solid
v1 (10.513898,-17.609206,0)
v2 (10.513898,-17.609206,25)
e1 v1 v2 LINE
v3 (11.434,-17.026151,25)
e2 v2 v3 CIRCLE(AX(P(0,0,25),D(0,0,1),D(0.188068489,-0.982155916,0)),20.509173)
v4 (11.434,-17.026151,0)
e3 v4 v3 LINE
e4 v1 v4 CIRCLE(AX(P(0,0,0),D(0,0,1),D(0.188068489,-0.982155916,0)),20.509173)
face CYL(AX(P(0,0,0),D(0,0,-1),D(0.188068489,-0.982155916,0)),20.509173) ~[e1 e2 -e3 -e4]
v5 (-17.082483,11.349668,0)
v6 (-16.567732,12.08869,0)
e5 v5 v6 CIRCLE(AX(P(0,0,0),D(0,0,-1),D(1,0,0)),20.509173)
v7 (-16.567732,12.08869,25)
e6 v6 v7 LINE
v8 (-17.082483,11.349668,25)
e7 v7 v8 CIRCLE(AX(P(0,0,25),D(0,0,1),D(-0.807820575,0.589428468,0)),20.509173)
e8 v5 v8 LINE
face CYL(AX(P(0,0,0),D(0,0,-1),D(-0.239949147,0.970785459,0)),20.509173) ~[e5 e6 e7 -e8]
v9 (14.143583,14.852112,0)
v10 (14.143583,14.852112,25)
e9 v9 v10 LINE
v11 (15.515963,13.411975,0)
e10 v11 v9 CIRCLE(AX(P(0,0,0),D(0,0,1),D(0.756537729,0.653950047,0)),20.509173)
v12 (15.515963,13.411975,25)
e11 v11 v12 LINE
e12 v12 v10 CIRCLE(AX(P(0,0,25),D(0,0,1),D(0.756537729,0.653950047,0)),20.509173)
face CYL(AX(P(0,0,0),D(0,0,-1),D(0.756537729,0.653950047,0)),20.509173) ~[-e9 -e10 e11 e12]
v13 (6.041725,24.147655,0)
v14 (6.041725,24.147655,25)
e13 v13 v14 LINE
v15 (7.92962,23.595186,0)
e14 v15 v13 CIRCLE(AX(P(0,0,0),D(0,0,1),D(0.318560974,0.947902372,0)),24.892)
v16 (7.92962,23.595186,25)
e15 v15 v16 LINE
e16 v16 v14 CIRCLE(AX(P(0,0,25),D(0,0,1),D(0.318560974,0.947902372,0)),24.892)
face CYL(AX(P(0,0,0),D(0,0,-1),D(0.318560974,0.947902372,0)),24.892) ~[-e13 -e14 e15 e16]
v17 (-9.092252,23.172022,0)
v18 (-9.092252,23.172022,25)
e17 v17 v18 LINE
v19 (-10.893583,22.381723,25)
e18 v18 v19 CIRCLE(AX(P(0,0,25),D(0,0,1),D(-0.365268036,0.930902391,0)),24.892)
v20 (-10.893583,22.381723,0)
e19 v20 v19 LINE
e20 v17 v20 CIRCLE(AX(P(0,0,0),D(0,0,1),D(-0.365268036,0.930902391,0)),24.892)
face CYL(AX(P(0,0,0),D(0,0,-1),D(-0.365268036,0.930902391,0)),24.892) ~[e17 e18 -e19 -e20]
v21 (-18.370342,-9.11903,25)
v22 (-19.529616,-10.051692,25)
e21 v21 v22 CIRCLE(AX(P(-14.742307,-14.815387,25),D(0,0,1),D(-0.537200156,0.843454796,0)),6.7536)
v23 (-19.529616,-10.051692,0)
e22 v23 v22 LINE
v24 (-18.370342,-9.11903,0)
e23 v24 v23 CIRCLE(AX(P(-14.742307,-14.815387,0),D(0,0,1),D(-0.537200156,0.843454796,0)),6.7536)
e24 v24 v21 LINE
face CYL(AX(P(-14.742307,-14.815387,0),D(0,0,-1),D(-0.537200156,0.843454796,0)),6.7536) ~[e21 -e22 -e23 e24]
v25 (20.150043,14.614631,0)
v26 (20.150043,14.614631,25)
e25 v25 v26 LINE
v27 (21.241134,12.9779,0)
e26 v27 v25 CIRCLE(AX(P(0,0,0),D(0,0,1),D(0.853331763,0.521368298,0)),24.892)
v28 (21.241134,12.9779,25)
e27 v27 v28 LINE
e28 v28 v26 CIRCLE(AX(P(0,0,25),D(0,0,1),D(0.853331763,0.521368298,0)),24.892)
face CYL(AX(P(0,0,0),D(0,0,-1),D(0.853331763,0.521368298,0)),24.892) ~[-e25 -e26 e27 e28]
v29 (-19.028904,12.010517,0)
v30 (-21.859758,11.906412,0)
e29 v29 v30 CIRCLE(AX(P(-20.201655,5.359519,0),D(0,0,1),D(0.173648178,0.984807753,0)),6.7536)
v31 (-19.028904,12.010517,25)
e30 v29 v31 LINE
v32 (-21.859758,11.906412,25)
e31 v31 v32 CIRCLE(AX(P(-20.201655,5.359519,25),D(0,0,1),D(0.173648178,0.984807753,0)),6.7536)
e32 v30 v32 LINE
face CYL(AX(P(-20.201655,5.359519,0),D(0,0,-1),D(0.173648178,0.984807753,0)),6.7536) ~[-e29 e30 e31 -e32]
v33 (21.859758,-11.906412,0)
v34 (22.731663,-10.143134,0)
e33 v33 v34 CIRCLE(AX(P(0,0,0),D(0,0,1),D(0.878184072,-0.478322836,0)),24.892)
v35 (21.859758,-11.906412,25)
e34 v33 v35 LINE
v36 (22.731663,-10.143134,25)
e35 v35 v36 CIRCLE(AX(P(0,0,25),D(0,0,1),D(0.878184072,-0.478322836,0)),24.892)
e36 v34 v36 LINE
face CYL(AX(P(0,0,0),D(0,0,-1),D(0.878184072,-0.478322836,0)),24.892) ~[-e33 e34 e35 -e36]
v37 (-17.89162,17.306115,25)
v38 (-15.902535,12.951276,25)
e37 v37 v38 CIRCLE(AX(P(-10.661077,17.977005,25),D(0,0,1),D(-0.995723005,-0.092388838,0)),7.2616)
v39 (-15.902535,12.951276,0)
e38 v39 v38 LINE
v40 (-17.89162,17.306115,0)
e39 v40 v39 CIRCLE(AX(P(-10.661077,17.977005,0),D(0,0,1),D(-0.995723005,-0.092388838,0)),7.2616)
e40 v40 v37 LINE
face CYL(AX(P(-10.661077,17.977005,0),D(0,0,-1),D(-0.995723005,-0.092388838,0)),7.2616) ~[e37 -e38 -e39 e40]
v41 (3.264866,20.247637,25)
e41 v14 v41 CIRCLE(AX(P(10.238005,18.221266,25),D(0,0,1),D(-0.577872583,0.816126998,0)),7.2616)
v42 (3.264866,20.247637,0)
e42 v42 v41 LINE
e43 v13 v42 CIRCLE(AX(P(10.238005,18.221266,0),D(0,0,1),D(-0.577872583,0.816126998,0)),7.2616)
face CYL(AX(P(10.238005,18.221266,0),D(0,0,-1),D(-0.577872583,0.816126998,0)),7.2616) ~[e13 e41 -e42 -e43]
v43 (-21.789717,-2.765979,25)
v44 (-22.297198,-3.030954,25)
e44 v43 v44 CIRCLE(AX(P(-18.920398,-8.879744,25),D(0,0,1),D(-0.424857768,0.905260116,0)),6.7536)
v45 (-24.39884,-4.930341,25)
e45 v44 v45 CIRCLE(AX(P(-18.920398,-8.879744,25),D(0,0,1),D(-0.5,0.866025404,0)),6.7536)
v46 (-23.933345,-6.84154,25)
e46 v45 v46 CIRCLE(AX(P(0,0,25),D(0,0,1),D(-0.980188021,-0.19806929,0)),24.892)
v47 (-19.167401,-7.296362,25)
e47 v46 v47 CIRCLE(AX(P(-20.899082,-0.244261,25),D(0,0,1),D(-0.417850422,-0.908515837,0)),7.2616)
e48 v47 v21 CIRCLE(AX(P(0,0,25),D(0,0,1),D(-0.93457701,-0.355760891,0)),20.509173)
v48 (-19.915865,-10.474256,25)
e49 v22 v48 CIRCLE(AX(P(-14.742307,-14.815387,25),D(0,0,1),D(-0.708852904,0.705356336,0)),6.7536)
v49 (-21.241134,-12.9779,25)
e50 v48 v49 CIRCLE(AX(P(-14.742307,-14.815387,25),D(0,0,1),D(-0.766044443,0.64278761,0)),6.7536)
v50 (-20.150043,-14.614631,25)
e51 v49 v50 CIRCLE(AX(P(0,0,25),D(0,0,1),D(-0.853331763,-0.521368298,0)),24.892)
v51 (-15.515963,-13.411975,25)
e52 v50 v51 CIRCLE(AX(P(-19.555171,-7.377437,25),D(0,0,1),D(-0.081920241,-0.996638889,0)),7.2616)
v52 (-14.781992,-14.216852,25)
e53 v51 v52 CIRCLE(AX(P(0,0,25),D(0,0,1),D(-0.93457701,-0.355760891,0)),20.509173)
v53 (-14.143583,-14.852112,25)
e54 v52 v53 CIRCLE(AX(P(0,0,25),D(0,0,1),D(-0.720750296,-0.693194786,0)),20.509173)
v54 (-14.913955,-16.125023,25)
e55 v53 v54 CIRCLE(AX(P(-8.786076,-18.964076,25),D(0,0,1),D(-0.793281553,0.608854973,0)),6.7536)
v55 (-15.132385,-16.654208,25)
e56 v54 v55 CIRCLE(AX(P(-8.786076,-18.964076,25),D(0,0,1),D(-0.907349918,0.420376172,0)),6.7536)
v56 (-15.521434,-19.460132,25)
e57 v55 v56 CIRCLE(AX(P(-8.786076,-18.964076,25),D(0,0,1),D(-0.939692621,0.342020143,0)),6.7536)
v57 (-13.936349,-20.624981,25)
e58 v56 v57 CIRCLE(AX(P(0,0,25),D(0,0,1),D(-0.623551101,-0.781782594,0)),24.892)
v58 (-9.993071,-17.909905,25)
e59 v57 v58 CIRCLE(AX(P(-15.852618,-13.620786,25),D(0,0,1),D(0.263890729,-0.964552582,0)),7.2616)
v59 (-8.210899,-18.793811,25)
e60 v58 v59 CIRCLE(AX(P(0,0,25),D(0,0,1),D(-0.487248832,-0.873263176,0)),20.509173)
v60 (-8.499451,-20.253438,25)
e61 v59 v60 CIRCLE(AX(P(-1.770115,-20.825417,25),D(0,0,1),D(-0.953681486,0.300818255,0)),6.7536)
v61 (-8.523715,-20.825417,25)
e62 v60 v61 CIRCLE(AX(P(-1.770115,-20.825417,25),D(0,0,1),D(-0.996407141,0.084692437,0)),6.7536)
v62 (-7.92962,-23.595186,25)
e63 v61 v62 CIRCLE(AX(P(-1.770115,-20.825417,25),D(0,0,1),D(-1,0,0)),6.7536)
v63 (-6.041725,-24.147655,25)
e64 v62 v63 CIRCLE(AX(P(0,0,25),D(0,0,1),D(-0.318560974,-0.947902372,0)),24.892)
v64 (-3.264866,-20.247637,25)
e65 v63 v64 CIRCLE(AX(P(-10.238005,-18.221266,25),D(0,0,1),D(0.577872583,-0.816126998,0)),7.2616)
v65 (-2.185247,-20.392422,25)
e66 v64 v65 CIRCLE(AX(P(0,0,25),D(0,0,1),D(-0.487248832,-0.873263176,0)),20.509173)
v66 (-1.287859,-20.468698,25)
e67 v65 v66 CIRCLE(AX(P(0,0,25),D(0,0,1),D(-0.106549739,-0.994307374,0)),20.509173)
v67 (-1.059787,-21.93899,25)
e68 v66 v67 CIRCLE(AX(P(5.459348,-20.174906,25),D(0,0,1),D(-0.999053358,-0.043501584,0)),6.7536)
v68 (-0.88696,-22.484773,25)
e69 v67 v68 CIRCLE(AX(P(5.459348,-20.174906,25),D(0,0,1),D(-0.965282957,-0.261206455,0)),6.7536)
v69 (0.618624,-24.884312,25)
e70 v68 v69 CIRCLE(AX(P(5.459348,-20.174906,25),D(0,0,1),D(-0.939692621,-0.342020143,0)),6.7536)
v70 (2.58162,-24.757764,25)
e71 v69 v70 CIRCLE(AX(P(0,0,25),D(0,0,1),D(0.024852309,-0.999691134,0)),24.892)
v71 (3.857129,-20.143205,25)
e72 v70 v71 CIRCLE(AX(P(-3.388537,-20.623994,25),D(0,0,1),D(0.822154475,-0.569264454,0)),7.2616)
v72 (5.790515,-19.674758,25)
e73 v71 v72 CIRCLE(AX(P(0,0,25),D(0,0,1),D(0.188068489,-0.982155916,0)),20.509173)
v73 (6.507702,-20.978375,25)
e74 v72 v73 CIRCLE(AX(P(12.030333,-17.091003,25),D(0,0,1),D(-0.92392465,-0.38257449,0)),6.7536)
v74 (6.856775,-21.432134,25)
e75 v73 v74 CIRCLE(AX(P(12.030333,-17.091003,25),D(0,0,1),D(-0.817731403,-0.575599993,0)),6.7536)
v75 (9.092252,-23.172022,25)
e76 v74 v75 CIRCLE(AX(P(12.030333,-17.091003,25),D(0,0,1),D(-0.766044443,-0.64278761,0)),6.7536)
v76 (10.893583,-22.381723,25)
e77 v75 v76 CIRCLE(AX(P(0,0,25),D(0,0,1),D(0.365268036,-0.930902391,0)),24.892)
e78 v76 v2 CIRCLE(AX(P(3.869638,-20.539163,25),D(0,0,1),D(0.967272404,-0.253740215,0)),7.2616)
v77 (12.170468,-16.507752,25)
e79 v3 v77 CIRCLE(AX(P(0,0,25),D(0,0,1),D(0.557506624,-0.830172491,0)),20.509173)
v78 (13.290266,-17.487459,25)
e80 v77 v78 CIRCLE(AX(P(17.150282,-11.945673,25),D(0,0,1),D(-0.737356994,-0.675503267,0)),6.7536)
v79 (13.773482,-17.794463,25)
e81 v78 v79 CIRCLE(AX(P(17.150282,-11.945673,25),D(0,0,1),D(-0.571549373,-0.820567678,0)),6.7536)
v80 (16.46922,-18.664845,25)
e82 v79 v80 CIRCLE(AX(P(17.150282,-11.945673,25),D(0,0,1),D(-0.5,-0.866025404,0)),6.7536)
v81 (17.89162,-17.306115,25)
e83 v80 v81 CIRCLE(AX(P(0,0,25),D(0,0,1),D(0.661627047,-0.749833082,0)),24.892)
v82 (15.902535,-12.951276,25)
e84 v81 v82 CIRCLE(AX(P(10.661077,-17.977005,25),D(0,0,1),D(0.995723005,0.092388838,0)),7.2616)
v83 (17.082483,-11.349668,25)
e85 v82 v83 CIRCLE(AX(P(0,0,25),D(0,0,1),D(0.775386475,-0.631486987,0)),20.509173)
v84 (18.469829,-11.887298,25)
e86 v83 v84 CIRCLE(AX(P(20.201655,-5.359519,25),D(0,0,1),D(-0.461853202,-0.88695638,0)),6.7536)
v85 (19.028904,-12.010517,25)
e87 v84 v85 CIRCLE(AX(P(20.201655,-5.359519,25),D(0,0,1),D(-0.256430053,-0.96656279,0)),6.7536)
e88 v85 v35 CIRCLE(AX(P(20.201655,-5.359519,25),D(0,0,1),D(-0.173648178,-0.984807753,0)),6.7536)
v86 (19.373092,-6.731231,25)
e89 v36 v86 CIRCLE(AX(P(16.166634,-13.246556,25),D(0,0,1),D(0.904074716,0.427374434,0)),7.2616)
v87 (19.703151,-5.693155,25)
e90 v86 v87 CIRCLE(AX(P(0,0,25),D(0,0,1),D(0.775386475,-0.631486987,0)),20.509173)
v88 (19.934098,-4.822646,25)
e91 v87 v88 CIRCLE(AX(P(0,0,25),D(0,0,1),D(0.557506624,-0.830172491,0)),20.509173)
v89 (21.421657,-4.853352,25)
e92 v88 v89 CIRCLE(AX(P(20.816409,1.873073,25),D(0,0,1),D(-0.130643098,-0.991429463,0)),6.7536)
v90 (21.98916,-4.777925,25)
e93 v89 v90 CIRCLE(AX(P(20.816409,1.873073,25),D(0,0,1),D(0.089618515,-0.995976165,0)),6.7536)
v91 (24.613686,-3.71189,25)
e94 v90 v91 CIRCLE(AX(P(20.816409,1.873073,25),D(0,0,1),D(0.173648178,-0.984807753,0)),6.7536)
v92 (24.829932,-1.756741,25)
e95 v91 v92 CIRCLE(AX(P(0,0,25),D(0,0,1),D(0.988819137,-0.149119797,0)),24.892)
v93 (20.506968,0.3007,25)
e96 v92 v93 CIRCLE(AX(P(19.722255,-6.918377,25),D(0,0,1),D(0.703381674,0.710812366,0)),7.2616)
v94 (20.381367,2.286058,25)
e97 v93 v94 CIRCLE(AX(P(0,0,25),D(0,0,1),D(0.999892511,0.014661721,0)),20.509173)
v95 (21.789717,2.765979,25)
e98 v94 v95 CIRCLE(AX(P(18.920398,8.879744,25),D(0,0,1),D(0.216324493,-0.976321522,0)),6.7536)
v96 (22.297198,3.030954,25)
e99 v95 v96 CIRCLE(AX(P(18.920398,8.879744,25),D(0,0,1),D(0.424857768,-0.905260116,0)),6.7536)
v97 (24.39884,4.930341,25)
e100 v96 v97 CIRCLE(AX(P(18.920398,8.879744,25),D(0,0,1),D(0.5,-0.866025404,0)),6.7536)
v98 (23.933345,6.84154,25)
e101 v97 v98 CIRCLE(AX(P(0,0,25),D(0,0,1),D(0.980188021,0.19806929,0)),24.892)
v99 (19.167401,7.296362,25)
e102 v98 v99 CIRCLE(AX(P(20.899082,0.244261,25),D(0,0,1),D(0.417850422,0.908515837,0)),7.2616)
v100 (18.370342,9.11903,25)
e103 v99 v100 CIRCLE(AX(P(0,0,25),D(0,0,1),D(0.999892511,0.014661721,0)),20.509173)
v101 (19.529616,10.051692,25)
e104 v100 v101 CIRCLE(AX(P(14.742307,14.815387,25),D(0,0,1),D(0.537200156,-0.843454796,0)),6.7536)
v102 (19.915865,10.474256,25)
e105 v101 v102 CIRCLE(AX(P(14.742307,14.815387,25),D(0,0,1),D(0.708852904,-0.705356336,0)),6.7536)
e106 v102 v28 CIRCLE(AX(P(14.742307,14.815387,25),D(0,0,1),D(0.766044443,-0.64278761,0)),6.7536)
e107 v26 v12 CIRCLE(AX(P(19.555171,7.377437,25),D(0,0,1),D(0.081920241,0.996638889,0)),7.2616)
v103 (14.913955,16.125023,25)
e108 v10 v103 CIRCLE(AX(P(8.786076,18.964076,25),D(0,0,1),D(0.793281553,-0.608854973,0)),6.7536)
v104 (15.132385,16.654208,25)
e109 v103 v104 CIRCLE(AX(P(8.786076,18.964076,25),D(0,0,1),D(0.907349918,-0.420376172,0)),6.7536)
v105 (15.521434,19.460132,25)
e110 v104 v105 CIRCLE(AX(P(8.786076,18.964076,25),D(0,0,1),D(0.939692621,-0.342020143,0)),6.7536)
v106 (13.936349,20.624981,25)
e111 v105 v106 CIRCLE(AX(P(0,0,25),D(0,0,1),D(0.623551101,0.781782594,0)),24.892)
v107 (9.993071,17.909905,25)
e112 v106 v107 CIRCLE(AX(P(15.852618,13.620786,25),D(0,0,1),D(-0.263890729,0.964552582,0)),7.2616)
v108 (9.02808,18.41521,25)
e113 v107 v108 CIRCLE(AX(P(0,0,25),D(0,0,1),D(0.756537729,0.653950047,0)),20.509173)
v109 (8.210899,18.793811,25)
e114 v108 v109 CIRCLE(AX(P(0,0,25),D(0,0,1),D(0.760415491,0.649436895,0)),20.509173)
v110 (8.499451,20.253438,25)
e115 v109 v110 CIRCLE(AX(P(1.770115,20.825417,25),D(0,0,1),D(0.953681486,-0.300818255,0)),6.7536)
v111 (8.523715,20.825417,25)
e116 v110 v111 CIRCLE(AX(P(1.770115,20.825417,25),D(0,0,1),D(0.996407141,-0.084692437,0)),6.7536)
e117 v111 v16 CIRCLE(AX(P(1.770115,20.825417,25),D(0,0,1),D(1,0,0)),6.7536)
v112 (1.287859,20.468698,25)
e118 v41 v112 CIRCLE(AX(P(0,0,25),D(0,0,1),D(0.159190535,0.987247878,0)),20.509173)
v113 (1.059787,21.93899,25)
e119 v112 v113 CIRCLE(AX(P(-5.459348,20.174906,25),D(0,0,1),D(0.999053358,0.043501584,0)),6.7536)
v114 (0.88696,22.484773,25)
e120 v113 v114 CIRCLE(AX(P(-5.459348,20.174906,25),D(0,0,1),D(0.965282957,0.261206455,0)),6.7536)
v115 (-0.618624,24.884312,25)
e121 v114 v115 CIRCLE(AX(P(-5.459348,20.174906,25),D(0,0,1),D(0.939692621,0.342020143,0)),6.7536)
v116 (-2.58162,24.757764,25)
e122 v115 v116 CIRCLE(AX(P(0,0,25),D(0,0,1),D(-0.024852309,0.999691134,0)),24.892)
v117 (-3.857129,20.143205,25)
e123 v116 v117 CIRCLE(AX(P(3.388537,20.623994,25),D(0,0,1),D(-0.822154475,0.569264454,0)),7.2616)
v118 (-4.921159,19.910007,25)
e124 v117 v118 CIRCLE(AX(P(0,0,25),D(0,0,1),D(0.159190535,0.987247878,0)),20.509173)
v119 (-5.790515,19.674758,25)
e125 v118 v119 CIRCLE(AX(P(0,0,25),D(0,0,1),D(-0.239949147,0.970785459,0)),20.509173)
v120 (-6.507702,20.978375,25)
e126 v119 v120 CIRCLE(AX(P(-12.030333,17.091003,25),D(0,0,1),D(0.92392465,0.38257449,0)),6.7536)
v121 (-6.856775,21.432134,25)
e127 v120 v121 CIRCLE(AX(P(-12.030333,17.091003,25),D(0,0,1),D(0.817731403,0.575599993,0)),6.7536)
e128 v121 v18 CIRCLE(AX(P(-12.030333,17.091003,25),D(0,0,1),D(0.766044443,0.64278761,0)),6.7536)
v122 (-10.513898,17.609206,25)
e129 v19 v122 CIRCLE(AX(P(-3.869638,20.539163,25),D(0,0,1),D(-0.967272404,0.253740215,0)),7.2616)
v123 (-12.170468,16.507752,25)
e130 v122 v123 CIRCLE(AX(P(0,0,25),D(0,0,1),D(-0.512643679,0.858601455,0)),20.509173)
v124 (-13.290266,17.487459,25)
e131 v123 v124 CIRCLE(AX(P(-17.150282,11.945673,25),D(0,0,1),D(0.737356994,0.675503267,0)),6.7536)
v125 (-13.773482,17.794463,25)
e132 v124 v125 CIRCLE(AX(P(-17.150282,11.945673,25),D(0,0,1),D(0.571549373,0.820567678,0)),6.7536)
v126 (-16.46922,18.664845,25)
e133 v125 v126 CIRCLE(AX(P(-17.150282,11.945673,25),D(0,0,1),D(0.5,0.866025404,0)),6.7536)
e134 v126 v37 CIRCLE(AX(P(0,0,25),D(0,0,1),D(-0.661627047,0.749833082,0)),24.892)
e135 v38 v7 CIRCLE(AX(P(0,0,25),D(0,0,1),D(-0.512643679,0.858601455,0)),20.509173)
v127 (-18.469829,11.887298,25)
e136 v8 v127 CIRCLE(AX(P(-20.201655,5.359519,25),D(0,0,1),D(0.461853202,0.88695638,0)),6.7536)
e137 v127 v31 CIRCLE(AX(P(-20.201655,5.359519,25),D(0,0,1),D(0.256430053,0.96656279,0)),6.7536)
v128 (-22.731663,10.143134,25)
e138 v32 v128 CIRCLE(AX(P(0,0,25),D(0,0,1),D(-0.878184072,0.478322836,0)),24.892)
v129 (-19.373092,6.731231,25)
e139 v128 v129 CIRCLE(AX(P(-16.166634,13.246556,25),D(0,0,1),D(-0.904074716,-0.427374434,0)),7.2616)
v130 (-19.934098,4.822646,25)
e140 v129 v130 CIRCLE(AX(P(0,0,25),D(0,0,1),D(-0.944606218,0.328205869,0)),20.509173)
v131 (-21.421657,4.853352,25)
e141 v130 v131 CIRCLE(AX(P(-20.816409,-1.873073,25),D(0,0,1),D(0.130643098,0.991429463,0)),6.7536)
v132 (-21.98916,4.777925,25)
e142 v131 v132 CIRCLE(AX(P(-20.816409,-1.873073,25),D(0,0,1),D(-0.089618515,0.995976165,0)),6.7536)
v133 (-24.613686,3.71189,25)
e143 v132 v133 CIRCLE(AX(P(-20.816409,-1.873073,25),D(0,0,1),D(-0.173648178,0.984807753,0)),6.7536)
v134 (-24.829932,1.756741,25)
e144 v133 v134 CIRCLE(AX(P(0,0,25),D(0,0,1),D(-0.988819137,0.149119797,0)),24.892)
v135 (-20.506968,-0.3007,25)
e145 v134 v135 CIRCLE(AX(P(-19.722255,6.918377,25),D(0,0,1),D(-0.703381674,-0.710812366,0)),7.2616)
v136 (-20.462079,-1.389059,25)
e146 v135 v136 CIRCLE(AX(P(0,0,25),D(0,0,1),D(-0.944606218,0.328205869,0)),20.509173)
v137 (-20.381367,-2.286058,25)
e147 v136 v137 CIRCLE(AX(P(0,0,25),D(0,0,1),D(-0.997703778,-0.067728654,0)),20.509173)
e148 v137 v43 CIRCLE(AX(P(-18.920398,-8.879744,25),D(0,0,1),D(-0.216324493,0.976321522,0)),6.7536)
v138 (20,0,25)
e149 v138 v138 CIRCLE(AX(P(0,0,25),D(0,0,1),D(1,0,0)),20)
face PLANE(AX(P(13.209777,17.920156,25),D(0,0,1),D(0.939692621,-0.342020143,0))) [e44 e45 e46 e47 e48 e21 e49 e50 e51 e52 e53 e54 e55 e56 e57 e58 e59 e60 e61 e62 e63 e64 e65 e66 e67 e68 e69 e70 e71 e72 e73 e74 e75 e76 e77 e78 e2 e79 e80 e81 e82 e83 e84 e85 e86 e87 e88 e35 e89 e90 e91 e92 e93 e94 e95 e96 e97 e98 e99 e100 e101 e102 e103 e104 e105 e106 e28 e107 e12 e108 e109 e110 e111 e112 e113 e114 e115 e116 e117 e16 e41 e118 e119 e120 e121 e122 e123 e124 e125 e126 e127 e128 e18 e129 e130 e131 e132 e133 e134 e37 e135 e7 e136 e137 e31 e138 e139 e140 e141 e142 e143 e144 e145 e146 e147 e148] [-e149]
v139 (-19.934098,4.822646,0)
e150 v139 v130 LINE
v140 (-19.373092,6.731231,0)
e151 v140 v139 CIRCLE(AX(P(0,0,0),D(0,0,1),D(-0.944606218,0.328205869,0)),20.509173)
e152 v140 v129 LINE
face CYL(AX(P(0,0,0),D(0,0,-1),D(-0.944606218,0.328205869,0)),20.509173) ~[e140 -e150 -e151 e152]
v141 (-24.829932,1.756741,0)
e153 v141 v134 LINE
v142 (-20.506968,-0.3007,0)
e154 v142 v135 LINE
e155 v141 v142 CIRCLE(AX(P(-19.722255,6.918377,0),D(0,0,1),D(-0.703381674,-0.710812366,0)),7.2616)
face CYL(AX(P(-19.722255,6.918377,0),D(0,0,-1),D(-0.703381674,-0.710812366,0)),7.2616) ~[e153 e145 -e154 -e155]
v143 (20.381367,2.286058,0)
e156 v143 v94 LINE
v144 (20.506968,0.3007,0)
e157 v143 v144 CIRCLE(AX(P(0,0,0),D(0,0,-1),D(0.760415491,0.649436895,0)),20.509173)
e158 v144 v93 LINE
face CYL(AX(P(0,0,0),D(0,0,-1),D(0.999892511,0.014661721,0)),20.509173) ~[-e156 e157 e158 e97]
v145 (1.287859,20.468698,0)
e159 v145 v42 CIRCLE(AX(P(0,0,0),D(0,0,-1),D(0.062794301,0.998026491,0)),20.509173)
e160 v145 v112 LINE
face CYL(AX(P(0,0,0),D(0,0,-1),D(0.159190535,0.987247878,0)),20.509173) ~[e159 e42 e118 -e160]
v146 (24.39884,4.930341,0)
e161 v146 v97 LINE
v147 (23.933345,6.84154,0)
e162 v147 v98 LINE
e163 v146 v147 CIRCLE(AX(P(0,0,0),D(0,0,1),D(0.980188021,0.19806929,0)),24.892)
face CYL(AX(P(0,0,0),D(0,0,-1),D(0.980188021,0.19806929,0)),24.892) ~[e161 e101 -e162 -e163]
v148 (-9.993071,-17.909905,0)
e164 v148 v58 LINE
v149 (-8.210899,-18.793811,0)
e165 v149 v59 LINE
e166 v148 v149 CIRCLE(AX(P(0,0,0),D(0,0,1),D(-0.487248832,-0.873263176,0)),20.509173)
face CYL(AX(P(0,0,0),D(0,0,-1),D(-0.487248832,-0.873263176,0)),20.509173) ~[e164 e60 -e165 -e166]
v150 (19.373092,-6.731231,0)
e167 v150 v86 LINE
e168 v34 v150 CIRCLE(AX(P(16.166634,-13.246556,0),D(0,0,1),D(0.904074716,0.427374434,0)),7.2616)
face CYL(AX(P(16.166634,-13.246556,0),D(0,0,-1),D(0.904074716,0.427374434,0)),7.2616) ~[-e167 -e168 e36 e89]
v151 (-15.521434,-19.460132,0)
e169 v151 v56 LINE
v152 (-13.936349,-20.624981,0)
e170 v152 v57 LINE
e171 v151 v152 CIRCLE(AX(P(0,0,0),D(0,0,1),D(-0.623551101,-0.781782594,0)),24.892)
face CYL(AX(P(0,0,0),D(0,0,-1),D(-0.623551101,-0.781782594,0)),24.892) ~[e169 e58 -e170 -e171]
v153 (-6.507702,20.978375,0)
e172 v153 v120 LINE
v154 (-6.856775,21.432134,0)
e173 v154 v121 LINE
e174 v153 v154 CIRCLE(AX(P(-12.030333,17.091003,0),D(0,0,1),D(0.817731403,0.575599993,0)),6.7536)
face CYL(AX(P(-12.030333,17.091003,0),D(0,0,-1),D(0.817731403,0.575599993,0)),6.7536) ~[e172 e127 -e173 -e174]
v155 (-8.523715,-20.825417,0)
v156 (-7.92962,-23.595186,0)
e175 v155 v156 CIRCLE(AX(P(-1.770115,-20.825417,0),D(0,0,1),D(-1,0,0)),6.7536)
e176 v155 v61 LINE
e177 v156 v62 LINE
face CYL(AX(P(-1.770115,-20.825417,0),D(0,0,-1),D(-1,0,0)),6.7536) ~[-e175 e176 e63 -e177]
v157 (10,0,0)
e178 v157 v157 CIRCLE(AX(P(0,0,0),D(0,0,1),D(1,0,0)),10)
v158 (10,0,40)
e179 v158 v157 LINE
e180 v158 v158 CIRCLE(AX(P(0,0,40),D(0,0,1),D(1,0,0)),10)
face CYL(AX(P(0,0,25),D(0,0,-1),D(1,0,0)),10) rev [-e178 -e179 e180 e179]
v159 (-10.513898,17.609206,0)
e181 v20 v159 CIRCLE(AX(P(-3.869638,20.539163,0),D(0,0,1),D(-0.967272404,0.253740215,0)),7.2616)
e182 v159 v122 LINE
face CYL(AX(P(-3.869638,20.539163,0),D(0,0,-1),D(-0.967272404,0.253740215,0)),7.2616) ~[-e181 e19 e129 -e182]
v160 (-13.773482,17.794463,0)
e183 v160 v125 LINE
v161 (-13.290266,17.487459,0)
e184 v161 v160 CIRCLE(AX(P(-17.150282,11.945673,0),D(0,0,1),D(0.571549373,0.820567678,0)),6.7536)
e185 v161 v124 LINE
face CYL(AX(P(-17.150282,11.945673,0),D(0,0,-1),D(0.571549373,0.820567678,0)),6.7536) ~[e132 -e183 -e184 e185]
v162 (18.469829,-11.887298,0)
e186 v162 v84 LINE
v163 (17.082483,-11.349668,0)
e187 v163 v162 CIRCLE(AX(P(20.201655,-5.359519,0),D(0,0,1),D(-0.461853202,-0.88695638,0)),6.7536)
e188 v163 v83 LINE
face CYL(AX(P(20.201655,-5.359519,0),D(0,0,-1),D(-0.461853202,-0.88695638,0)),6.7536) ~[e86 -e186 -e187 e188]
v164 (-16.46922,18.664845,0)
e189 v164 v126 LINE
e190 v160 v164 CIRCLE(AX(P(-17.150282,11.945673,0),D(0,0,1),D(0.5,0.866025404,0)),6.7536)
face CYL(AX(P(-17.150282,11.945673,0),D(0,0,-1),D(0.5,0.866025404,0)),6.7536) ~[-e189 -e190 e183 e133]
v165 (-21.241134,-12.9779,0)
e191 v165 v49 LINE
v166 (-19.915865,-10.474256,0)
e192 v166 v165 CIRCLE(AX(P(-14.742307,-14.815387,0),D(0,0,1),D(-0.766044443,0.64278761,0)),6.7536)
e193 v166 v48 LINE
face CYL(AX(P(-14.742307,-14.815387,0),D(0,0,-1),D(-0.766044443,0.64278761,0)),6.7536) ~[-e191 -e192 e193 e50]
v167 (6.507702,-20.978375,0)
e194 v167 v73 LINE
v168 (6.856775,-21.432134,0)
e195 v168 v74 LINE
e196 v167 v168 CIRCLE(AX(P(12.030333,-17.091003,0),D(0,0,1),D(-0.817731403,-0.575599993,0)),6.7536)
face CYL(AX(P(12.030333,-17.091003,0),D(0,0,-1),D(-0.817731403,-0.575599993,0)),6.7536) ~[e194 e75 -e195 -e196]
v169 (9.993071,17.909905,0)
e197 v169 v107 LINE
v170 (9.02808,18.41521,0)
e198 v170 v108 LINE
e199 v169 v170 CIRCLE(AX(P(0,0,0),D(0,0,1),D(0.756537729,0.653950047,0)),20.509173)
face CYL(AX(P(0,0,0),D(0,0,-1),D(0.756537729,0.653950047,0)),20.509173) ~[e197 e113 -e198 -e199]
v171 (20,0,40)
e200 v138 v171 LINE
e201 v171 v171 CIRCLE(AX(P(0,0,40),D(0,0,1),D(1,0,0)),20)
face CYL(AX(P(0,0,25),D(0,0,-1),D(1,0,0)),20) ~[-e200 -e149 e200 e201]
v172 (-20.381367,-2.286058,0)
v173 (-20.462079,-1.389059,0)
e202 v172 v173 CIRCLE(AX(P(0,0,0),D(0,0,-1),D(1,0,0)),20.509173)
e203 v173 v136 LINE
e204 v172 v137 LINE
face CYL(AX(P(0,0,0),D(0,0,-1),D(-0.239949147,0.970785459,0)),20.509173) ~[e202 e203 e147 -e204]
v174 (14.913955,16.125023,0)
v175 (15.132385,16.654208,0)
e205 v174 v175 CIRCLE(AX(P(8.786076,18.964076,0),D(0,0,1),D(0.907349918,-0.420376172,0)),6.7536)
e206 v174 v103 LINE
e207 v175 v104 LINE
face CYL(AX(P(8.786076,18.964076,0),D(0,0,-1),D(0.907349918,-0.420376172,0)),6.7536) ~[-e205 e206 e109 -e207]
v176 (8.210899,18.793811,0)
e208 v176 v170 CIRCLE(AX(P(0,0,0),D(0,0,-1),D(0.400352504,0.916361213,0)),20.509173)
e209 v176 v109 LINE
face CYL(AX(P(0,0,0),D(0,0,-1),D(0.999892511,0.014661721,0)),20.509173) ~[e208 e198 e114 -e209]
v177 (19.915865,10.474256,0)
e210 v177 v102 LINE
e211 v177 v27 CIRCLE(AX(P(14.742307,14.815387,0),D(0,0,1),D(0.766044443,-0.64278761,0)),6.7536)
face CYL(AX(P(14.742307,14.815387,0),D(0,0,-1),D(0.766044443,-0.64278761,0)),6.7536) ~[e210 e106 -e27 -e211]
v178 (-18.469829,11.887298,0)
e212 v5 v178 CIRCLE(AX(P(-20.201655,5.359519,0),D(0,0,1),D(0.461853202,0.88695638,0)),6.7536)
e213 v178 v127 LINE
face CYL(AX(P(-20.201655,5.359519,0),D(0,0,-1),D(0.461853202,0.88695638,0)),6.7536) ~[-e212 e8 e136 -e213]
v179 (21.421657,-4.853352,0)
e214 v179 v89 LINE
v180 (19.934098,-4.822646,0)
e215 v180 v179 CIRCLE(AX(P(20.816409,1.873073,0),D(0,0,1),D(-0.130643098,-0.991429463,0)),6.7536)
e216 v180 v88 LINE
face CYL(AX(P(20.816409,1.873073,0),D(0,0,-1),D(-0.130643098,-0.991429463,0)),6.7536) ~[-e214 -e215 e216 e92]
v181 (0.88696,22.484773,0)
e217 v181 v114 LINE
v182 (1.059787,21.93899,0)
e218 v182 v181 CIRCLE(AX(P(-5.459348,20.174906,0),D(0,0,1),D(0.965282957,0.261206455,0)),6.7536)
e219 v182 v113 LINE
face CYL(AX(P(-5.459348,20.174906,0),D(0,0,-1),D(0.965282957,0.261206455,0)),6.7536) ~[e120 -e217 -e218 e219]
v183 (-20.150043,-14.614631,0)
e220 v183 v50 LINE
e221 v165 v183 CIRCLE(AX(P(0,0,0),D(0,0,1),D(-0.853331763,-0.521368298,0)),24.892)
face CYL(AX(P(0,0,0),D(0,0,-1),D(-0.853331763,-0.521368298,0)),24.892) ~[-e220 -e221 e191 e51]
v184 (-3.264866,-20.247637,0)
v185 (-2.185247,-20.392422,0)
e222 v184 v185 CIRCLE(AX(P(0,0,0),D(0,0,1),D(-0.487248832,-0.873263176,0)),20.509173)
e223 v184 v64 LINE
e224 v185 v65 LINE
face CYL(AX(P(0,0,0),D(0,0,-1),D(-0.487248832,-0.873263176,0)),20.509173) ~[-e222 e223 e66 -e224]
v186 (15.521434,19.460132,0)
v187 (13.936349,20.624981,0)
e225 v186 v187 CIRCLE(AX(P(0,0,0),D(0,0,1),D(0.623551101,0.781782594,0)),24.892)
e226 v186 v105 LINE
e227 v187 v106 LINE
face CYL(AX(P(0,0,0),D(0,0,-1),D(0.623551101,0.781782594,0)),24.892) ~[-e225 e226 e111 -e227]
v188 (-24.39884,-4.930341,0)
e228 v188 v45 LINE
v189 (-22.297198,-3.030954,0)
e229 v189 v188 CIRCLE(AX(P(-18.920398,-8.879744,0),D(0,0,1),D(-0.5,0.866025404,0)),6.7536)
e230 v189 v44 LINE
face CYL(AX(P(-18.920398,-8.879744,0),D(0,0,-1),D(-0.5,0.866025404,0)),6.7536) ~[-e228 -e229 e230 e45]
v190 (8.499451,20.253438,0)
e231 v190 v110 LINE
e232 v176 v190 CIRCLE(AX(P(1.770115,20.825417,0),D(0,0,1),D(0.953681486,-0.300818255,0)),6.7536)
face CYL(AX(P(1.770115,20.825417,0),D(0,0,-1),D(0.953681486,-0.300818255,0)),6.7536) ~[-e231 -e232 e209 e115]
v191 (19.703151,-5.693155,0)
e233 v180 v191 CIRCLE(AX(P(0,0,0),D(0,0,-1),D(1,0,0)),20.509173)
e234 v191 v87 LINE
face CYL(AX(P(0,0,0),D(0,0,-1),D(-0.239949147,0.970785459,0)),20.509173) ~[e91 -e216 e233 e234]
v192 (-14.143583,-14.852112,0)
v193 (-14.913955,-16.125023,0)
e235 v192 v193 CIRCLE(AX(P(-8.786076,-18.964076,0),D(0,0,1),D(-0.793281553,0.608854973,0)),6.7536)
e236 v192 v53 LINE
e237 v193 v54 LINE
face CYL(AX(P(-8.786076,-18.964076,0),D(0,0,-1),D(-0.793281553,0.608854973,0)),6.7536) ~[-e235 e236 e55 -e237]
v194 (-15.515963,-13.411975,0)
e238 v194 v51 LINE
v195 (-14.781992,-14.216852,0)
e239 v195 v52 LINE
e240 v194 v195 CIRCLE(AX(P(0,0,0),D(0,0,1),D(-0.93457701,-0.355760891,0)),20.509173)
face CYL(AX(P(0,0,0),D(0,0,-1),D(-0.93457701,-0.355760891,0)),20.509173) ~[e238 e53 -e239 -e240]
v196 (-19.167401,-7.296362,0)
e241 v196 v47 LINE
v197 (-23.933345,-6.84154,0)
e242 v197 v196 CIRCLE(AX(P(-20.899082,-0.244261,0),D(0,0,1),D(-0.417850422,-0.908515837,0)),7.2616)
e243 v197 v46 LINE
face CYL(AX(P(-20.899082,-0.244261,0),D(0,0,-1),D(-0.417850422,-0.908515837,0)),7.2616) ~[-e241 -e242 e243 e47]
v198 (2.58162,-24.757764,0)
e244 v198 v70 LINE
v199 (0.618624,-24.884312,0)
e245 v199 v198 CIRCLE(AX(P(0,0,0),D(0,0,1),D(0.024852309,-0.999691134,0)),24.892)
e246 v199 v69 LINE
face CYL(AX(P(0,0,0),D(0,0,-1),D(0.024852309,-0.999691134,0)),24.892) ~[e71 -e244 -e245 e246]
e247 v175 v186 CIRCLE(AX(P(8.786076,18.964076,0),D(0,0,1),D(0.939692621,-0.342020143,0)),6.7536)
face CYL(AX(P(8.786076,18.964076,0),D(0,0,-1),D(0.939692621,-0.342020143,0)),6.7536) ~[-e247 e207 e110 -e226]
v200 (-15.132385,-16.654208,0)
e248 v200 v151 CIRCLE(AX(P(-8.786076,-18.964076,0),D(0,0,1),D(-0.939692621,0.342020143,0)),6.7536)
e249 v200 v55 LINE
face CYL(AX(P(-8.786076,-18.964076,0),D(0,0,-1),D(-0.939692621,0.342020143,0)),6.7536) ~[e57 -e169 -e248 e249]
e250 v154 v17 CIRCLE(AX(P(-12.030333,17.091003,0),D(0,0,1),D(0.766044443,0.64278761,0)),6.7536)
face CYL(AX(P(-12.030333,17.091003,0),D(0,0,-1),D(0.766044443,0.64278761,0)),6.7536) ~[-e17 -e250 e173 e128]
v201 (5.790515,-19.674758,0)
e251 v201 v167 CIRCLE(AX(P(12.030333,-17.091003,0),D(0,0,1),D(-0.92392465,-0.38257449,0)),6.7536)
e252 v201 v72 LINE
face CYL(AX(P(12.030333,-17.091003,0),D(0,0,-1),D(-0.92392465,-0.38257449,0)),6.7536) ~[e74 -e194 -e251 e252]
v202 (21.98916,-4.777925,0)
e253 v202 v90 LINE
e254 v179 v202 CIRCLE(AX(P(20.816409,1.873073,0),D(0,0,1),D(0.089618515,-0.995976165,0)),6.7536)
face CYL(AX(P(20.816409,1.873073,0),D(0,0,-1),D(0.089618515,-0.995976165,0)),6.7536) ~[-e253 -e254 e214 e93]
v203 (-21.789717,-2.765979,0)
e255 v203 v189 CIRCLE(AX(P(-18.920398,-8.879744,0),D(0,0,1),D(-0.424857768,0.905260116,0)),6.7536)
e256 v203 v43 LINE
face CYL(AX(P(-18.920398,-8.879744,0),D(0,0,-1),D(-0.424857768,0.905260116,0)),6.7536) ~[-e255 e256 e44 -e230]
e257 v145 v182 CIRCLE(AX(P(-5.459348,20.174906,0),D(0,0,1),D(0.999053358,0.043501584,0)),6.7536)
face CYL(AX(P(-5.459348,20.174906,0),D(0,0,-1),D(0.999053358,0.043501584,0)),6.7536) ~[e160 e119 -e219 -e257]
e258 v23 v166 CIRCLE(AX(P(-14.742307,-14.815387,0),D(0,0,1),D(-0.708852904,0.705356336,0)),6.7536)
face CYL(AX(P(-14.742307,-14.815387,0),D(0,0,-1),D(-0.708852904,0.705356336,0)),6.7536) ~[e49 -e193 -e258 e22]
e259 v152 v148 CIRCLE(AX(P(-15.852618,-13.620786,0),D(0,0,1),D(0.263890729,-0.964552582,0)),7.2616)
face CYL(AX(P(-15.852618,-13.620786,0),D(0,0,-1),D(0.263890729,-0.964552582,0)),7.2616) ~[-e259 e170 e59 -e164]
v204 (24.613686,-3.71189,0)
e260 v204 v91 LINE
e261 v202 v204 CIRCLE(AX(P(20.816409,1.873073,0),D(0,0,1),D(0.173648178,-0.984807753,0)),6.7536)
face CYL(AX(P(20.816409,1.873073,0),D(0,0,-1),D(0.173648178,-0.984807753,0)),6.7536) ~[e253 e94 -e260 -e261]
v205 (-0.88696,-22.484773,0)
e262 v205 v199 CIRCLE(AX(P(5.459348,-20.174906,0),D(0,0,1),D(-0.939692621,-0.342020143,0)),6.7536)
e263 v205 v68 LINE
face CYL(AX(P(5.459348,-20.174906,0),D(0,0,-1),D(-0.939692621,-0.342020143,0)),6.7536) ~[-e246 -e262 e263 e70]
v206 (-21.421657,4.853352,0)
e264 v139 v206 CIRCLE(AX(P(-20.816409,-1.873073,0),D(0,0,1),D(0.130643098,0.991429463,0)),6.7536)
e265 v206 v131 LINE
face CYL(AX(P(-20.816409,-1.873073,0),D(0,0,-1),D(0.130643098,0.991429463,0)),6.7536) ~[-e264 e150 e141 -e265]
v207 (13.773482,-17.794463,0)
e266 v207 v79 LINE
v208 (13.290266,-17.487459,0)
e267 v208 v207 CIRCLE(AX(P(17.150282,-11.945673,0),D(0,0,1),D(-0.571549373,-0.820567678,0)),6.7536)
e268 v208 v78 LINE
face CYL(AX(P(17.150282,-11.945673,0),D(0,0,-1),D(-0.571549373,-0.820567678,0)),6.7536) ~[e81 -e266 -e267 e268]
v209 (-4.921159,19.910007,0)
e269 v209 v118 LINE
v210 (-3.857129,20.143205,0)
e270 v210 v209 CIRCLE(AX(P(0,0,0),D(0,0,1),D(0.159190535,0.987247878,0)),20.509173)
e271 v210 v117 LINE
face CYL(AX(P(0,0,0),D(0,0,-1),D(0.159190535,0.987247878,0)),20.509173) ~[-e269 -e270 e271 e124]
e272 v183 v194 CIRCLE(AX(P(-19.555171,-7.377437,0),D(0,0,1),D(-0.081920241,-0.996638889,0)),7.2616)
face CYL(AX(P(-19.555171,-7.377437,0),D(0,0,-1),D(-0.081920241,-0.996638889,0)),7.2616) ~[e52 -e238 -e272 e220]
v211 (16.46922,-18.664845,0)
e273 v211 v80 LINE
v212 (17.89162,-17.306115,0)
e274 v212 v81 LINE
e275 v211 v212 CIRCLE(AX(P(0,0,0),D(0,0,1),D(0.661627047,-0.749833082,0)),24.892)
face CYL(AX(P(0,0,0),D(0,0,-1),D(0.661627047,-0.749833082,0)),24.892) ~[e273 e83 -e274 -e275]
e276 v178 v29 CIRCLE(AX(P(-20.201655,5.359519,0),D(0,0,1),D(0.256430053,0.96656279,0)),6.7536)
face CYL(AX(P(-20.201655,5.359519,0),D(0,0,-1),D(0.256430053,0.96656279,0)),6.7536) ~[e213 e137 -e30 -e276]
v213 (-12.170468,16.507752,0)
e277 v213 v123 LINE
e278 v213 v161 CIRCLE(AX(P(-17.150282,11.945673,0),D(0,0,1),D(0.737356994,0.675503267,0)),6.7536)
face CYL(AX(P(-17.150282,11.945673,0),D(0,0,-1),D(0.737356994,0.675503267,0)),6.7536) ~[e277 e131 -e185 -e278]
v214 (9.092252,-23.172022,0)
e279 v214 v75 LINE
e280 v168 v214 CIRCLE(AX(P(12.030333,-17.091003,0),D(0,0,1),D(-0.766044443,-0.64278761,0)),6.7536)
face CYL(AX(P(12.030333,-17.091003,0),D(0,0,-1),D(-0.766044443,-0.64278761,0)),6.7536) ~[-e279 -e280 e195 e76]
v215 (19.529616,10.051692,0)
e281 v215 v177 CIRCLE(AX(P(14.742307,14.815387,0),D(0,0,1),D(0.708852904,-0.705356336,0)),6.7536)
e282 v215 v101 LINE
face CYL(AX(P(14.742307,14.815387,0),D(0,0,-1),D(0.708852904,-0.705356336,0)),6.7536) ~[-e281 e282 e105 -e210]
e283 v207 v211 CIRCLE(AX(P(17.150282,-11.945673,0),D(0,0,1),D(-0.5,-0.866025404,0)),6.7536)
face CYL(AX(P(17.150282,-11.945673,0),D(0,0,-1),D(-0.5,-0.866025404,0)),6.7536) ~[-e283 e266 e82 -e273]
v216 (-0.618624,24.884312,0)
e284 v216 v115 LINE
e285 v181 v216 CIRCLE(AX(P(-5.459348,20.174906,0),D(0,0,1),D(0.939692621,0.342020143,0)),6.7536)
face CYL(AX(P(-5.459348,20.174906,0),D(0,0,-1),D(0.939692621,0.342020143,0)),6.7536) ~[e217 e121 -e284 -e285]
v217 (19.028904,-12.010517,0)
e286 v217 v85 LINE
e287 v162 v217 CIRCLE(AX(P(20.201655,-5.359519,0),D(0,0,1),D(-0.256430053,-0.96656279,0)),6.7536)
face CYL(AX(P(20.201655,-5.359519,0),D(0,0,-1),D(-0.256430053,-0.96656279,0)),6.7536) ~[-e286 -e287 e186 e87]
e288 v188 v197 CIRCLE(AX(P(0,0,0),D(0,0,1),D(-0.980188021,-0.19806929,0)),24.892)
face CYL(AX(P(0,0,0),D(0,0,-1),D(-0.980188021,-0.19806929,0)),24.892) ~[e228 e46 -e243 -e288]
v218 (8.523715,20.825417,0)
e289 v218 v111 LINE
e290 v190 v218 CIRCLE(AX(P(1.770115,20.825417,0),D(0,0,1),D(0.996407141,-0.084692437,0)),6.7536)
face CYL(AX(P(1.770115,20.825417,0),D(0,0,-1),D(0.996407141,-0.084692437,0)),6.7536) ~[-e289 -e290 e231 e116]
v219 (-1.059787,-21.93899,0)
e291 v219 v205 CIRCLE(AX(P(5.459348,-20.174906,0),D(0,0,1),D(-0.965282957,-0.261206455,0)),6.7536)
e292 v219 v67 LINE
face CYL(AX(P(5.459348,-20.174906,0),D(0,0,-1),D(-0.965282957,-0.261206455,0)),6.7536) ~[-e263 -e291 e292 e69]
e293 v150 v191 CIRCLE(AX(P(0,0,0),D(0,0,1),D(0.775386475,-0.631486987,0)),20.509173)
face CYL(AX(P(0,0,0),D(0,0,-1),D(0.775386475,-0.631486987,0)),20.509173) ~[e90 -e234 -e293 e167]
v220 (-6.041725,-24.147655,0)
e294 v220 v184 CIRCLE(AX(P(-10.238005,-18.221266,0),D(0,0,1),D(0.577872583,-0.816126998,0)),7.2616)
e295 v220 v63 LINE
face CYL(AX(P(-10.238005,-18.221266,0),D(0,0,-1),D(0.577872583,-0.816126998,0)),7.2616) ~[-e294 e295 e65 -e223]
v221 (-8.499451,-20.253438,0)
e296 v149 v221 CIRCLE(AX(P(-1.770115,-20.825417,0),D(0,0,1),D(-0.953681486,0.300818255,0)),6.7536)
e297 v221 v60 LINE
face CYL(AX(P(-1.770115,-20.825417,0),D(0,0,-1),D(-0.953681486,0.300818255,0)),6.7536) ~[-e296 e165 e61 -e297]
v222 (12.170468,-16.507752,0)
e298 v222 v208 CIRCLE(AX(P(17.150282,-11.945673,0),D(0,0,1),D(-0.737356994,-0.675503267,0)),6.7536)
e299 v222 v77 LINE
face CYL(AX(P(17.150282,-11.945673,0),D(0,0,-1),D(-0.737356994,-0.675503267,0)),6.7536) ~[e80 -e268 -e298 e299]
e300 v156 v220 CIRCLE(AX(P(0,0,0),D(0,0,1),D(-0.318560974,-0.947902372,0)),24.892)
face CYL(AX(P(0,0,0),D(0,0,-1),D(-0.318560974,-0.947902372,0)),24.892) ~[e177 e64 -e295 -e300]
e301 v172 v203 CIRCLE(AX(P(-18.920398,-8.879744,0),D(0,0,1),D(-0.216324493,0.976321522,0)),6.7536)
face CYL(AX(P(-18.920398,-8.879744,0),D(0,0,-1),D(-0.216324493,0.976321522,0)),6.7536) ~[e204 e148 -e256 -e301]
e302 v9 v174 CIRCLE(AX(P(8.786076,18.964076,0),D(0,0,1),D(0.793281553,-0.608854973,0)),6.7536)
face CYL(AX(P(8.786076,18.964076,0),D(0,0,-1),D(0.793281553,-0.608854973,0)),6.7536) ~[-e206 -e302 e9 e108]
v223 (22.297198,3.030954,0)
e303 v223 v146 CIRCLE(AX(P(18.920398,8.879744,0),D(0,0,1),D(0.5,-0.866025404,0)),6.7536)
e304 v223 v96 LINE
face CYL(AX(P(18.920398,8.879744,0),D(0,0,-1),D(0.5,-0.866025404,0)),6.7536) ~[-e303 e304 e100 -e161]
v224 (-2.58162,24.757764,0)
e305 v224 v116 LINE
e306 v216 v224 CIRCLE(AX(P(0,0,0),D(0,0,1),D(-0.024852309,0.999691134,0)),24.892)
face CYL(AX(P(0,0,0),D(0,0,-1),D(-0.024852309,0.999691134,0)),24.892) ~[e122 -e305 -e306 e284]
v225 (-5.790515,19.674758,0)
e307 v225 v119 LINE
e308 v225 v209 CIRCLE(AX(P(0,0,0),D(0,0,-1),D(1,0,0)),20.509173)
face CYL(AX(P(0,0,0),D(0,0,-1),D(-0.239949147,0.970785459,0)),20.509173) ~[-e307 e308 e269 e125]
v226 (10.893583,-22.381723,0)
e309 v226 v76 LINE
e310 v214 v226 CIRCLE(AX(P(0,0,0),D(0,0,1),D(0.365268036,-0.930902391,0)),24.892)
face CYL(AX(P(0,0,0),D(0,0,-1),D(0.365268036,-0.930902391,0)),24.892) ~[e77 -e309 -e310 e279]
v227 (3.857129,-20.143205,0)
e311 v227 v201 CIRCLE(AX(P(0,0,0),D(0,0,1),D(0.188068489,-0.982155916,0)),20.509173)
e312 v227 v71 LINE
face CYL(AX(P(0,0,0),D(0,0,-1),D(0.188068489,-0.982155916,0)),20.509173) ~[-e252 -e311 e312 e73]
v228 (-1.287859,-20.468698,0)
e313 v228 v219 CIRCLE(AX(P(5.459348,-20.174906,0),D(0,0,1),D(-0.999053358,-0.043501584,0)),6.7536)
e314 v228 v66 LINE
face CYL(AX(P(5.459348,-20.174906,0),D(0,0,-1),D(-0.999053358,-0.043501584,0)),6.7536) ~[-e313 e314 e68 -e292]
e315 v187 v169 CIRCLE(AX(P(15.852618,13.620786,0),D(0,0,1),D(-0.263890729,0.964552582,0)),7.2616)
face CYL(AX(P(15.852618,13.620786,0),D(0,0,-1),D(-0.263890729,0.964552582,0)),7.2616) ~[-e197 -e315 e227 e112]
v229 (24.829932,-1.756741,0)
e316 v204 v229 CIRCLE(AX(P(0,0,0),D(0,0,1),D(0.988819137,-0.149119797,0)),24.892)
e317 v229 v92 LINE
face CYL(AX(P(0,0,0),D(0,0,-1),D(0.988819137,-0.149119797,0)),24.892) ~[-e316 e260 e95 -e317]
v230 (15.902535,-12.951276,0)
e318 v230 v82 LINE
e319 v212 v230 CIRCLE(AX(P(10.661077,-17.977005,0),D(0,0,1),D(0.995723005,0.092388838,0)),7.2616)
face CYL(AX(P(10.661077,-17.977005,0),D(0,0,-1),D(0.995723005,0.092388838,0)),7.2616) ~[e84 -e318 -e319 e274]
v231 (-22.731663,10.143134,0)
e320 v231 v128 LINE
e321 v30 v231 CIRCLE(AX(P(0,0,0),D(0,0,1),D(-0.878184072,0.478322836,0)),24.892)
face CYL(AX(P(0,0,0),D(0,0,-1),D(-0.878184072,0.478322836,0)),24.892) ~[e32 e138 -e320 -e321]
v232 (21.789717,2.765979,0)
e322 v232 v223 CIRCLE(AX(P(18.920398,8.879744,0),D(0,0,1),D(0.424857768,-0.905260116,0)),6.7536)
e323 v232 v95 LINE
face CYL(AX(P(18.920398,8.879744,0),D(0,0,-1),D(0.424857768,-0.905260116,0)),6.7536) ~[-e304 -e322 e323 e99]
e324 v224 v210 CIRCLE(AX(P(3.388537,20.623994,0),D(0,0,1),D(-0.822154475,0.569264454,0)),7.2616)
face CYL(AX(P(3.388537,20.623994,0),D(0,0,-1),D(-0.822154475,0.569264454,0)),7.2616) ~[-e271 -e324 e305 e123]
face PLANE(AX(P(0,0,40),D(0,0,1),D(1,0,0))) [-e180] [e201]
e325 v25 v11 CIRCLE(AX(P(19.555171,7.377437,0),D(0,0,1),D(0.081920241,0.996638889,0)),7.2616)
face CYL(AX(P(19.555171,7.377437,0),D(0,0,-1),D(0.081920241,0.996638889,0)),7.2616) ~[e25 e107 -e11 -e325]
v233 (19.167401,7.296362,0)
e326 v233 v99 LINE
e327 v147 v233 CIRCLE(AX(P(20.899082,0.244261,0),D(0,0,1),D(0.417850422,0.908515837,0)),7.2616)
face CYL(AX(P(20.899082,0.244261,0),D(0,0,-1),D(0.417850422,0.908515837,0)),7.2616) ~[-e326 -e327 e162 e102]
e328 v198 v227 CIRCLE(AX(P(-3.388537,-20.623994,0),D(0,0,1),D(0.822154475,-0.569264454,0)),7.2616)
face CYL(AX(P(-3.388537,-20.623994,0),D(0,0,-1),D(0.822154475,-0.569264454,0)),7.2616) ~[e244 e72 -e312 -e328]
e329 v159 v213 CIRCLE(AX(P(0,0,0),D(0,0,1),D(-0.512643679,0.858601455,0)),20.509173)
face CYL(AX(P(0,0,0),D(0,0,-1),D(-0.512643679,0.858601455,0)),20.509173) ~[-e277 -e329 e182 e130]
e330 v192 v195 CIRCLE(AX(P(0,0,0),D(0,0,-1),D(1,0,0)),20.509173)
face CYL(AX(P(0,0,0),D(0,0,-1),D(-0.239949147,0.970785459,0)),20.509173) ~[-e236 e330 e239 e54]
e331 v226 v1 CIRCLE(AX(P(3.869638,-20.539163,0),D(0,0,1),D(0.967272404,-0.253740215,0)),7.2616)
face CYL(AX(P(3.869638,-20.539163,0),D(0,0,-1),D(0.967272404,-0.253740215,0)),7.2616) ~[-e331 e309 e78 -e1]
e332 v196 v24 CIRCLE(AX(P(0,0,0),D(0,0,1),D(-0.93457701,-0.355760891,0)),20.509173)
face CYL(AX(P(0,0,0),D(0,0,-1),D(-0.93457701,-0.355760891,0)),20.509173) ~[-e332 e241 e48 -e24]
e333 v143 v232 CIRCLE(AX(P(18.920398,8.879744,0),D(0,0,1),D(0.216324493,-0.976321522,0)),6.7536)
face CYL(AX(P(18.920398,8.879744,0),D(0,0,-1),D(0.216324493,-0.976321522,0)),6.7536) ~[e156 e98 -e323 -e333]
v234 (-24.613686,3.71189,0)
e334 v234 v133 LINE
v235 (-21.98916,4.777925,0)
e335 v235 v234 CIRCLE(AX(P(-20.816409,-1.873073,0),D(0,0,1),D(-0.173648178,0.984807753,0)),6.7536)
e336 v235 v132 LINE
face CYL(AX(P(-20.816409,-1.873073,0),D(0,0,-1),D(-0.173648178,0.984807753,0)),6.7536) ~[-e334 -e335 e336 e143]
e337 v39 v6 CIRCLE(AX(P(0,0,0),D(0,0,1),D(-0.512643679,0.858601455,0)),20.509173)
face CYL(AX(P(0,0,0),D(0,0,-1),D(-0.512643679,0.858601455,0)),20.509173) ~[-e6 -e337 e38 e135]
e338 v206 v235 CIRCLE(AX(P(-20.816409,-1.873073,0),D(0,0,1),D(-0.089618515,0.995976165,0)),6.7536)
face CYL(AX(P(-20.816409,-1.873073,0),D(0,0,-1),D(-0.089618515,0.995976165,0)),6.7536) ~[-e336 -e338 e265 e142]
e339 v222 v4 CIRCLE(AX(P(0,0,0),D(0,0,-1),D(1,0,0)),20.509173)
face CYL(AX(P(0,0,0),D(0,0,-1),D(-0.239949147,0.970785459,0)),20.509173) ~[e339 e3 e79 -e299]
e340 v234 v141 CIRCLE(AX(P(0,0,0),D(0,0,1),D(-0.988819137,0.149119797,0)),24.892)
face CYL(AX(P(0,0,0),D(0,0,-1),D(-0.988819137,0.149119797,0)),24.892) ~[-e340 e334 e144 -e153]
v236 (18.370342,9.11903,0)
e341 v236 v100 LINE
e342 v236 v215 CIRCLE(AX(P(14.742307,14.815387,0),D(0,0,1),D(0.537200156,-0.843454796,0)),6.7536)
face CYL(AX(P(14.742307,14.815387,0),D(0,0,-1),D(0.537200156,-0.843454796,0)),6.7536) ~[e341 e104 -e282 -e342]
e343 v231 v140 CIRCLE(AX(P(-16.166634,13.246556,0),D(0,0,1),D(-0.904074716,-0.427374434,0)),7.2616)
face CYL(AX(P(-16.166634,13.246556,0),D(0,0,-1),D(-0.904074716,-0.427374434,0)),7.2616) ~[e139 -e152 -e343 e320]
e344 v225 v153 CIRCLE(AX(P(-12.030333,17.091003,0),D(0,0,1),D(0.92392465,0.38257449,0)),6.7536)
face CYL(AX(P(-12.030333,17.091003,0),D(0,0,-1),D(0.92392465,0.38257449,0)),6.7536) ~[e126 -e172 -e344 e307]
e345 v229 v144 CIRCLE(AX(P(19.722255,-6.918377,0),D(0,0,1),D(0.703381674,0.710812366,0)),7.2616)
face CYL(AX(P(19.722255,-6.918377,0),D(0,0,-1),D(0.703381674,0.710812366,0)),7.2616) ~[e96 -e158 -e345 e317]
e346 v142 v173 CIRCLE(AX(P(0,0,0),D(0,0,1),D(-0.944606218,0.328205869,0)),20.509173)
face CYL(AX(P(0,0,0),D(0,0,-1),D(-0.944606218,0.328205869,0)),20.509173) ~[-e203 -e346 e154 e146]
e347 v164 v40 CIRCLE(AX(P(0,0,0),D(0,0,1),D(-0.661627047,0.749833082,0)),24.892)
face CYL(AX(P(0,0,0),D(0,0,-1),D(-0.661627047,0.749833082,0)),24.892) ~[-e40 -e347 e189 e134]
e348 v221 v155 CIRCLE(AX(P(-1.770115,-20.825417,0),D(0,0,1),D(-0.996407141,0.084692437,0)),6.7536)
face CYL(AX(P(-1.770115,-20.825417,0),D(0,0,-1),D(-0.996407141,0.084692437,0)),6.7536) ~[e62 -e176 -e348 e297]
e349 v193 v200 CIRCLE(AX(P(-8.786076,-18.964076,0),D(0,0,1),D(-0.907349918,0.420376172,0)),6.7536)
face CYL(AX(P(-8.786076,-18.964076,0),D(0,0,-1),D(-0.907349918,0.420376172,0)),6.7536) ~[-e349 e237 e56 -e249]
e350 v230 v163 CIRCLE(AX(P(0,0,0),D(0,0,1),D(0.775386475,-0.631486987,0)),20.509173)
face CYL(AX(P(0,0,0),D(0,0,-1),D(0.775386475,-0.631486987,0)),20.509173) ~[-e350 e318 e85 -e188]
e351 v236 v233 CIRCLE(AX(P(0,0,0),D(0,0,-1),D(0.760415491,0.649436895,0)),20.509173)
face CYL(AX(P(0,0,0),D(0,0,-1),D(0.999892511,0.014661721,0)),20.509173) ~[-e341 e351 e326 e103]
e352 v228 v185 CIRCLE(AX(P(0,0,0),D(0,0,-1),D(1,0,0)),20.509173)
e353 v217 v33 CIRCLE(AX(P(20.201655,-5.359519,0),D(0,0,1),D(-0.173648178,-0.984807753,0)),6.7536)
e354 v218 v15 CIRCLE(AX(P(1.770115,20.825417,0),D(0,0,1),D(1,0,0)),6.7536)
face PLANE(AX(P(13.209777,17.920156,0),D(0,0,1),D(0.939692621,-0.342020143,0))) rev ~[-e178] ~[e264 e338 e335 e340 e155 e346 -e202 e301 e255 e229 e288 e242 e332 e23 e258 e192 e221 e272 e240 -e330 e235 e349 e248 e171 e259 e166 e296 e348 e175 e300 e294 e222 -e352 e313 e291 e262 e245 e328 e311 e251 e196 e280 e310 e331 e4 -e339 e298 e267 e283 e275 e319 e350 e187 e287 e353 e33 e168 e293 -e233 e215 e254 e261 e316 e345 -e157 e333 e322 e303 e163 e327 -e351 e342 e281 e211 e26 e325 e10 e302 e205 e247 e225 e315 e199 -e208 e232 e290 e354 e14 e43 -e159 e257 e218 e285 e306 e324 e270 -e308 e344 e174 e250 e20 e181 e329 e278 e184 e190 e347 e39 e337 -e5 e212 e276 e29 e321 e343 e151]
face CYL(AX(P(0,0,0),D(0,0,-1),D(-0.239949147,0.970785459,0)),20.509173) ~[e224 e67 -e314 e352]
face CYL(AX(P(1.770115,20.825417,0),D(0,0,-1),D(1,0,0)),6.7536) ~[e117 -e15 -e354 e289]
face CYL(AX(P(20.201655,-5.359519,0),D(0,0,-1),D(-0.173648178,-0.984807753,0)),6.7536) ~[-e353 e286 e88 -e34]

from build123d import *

# Parameters (mm, degrees)
F0_R     = 10
F1_DEPTH = 25
F2_COUNT = 18
F3_R     = 20
F3_R_2   = 10
F4_DEPTH = 15


with BuildPart() as f1:
    # F0 (on Top) → F1 (new body)
    with BuildSketch(Plane.XY):
        with BuildLine():
            ThreePointArc((7.9296197565, 23.5951858335), (6.9911317973, 23.8900761864), (6.0417249702, 24.1476546146))
            ThreePointArc((6.0417249702, 24.1476546146), (4.3226425573, 22.4330749308), (3.2648662162, 20.2476374354))
            ThreePointArc((3.2648662162, 20.2476374354), (5.7837443287, 19.6767495961), (8.2108987358, 18.7938105523))
            ThreePointArc((8.2108987358, 18.7938105523), (8.3954934616, 19.5156536929), (8.4994507341, 20.2534379554))
            ThreePointArc((8.4994507341, 20.2534379554), (8.5176465567, 20.5391701676), (8.5237154667, 20.8254168329))
            ThreePointArc((8.5237154667, 20.8254168329), (8.373521449, 22.2418004346), (7.9296197565, 23.5951858335))
        make_face()
        with BuildLine():
            ThreePointArc((4.0264902572, 14.4598933509), (-1.7431476836, 15.057566034), (-4.9211585336, 19.9100068261))
            ThreePointArc((-4.9211585336, 19.9100068261), (-12.6431262329, -16.1486077476), (20.5091729021, 0))
            ThreePointArc((20.5091729021, 0), (19.2415803806, 7.0984334598), (15.5954927821, 13.3194135761))
            ThreePointArc((15.5954927821, 13.3194135761), (9.5256046991, 10.9946956396), (4.0264902572, 14.4598933509))
        make_face()
        Circle(F0_R, mode=Mode.SUBTRACT)
        with BuildLine():
            ThreePointArc((3.2648662162, 20.2476374354), (-0.8451772993, 20.4917507417), (-4.9211585336, 19.9100068261))
            ThreePointArc((-4.9211585336, 19.9100068261), (-1.7431476836, 15.057566034), (4.0264902572, 14.4598933509))
            ThreePointArc((4.0264902572, 14.4598933509), (3.0384725246, 17.2738616412), (3.2648662162, 20.2476374354))
        make_face()
        with BuildLine():
            ThreePointArc((4.0264902572, 14.4598933509), (9.5256046991, 10.9946956396), (15.5954927821, 13.3194135761))
            ThreePointArc((15.5954927821, 13.3194135761), (12.2138579016, 16.4756744411), (8.2108987358, 18.7938105523))
            ThreePointArc((8.2108987358, 18.7938105523), (6.6287005247, 16.1344397874), (4.0264902572, 14.4598933509))
        make_face()
        with BuildLine():
            ThreePointArc((8.2108987358, 18.7938105523), (5.7837443287, 19.6767495961), (3.2648662162, 20.2476374354))
            ThreePointArc((3.2648662162, 20.2476374354), (3.0384725246, 17.2738616412), (4.0264902572, 14.4598933509))
            ThreePointArc((4.0264902572, 14.4598933509), (6.6287005247, 16.1344397874), (8.2108987358, 18.7938105523))
        make_face()
    extrude(amount=F1_DEPTH)

    # F2: F1 ×18 about axis
    f2_axis = Axis((0, 0, 25), (0, 0, 1))


with BuildPart() as f1_1:
    add(f1.part)
    for i in range(1, F2_COUNT):
        add(f1.part.rotate(f2_axis, i * 360 / F2_COUNT))

    # F3 (on face) → F4 (join)
    with BuildSketch(Plane.XY.offset(25)):
        Circle(F3_R)
        Circle(F3_R_2, mode=Mode.SUBTRACT)
    extrude(amount=F4_DEPTH)


solid = f1_1.part
